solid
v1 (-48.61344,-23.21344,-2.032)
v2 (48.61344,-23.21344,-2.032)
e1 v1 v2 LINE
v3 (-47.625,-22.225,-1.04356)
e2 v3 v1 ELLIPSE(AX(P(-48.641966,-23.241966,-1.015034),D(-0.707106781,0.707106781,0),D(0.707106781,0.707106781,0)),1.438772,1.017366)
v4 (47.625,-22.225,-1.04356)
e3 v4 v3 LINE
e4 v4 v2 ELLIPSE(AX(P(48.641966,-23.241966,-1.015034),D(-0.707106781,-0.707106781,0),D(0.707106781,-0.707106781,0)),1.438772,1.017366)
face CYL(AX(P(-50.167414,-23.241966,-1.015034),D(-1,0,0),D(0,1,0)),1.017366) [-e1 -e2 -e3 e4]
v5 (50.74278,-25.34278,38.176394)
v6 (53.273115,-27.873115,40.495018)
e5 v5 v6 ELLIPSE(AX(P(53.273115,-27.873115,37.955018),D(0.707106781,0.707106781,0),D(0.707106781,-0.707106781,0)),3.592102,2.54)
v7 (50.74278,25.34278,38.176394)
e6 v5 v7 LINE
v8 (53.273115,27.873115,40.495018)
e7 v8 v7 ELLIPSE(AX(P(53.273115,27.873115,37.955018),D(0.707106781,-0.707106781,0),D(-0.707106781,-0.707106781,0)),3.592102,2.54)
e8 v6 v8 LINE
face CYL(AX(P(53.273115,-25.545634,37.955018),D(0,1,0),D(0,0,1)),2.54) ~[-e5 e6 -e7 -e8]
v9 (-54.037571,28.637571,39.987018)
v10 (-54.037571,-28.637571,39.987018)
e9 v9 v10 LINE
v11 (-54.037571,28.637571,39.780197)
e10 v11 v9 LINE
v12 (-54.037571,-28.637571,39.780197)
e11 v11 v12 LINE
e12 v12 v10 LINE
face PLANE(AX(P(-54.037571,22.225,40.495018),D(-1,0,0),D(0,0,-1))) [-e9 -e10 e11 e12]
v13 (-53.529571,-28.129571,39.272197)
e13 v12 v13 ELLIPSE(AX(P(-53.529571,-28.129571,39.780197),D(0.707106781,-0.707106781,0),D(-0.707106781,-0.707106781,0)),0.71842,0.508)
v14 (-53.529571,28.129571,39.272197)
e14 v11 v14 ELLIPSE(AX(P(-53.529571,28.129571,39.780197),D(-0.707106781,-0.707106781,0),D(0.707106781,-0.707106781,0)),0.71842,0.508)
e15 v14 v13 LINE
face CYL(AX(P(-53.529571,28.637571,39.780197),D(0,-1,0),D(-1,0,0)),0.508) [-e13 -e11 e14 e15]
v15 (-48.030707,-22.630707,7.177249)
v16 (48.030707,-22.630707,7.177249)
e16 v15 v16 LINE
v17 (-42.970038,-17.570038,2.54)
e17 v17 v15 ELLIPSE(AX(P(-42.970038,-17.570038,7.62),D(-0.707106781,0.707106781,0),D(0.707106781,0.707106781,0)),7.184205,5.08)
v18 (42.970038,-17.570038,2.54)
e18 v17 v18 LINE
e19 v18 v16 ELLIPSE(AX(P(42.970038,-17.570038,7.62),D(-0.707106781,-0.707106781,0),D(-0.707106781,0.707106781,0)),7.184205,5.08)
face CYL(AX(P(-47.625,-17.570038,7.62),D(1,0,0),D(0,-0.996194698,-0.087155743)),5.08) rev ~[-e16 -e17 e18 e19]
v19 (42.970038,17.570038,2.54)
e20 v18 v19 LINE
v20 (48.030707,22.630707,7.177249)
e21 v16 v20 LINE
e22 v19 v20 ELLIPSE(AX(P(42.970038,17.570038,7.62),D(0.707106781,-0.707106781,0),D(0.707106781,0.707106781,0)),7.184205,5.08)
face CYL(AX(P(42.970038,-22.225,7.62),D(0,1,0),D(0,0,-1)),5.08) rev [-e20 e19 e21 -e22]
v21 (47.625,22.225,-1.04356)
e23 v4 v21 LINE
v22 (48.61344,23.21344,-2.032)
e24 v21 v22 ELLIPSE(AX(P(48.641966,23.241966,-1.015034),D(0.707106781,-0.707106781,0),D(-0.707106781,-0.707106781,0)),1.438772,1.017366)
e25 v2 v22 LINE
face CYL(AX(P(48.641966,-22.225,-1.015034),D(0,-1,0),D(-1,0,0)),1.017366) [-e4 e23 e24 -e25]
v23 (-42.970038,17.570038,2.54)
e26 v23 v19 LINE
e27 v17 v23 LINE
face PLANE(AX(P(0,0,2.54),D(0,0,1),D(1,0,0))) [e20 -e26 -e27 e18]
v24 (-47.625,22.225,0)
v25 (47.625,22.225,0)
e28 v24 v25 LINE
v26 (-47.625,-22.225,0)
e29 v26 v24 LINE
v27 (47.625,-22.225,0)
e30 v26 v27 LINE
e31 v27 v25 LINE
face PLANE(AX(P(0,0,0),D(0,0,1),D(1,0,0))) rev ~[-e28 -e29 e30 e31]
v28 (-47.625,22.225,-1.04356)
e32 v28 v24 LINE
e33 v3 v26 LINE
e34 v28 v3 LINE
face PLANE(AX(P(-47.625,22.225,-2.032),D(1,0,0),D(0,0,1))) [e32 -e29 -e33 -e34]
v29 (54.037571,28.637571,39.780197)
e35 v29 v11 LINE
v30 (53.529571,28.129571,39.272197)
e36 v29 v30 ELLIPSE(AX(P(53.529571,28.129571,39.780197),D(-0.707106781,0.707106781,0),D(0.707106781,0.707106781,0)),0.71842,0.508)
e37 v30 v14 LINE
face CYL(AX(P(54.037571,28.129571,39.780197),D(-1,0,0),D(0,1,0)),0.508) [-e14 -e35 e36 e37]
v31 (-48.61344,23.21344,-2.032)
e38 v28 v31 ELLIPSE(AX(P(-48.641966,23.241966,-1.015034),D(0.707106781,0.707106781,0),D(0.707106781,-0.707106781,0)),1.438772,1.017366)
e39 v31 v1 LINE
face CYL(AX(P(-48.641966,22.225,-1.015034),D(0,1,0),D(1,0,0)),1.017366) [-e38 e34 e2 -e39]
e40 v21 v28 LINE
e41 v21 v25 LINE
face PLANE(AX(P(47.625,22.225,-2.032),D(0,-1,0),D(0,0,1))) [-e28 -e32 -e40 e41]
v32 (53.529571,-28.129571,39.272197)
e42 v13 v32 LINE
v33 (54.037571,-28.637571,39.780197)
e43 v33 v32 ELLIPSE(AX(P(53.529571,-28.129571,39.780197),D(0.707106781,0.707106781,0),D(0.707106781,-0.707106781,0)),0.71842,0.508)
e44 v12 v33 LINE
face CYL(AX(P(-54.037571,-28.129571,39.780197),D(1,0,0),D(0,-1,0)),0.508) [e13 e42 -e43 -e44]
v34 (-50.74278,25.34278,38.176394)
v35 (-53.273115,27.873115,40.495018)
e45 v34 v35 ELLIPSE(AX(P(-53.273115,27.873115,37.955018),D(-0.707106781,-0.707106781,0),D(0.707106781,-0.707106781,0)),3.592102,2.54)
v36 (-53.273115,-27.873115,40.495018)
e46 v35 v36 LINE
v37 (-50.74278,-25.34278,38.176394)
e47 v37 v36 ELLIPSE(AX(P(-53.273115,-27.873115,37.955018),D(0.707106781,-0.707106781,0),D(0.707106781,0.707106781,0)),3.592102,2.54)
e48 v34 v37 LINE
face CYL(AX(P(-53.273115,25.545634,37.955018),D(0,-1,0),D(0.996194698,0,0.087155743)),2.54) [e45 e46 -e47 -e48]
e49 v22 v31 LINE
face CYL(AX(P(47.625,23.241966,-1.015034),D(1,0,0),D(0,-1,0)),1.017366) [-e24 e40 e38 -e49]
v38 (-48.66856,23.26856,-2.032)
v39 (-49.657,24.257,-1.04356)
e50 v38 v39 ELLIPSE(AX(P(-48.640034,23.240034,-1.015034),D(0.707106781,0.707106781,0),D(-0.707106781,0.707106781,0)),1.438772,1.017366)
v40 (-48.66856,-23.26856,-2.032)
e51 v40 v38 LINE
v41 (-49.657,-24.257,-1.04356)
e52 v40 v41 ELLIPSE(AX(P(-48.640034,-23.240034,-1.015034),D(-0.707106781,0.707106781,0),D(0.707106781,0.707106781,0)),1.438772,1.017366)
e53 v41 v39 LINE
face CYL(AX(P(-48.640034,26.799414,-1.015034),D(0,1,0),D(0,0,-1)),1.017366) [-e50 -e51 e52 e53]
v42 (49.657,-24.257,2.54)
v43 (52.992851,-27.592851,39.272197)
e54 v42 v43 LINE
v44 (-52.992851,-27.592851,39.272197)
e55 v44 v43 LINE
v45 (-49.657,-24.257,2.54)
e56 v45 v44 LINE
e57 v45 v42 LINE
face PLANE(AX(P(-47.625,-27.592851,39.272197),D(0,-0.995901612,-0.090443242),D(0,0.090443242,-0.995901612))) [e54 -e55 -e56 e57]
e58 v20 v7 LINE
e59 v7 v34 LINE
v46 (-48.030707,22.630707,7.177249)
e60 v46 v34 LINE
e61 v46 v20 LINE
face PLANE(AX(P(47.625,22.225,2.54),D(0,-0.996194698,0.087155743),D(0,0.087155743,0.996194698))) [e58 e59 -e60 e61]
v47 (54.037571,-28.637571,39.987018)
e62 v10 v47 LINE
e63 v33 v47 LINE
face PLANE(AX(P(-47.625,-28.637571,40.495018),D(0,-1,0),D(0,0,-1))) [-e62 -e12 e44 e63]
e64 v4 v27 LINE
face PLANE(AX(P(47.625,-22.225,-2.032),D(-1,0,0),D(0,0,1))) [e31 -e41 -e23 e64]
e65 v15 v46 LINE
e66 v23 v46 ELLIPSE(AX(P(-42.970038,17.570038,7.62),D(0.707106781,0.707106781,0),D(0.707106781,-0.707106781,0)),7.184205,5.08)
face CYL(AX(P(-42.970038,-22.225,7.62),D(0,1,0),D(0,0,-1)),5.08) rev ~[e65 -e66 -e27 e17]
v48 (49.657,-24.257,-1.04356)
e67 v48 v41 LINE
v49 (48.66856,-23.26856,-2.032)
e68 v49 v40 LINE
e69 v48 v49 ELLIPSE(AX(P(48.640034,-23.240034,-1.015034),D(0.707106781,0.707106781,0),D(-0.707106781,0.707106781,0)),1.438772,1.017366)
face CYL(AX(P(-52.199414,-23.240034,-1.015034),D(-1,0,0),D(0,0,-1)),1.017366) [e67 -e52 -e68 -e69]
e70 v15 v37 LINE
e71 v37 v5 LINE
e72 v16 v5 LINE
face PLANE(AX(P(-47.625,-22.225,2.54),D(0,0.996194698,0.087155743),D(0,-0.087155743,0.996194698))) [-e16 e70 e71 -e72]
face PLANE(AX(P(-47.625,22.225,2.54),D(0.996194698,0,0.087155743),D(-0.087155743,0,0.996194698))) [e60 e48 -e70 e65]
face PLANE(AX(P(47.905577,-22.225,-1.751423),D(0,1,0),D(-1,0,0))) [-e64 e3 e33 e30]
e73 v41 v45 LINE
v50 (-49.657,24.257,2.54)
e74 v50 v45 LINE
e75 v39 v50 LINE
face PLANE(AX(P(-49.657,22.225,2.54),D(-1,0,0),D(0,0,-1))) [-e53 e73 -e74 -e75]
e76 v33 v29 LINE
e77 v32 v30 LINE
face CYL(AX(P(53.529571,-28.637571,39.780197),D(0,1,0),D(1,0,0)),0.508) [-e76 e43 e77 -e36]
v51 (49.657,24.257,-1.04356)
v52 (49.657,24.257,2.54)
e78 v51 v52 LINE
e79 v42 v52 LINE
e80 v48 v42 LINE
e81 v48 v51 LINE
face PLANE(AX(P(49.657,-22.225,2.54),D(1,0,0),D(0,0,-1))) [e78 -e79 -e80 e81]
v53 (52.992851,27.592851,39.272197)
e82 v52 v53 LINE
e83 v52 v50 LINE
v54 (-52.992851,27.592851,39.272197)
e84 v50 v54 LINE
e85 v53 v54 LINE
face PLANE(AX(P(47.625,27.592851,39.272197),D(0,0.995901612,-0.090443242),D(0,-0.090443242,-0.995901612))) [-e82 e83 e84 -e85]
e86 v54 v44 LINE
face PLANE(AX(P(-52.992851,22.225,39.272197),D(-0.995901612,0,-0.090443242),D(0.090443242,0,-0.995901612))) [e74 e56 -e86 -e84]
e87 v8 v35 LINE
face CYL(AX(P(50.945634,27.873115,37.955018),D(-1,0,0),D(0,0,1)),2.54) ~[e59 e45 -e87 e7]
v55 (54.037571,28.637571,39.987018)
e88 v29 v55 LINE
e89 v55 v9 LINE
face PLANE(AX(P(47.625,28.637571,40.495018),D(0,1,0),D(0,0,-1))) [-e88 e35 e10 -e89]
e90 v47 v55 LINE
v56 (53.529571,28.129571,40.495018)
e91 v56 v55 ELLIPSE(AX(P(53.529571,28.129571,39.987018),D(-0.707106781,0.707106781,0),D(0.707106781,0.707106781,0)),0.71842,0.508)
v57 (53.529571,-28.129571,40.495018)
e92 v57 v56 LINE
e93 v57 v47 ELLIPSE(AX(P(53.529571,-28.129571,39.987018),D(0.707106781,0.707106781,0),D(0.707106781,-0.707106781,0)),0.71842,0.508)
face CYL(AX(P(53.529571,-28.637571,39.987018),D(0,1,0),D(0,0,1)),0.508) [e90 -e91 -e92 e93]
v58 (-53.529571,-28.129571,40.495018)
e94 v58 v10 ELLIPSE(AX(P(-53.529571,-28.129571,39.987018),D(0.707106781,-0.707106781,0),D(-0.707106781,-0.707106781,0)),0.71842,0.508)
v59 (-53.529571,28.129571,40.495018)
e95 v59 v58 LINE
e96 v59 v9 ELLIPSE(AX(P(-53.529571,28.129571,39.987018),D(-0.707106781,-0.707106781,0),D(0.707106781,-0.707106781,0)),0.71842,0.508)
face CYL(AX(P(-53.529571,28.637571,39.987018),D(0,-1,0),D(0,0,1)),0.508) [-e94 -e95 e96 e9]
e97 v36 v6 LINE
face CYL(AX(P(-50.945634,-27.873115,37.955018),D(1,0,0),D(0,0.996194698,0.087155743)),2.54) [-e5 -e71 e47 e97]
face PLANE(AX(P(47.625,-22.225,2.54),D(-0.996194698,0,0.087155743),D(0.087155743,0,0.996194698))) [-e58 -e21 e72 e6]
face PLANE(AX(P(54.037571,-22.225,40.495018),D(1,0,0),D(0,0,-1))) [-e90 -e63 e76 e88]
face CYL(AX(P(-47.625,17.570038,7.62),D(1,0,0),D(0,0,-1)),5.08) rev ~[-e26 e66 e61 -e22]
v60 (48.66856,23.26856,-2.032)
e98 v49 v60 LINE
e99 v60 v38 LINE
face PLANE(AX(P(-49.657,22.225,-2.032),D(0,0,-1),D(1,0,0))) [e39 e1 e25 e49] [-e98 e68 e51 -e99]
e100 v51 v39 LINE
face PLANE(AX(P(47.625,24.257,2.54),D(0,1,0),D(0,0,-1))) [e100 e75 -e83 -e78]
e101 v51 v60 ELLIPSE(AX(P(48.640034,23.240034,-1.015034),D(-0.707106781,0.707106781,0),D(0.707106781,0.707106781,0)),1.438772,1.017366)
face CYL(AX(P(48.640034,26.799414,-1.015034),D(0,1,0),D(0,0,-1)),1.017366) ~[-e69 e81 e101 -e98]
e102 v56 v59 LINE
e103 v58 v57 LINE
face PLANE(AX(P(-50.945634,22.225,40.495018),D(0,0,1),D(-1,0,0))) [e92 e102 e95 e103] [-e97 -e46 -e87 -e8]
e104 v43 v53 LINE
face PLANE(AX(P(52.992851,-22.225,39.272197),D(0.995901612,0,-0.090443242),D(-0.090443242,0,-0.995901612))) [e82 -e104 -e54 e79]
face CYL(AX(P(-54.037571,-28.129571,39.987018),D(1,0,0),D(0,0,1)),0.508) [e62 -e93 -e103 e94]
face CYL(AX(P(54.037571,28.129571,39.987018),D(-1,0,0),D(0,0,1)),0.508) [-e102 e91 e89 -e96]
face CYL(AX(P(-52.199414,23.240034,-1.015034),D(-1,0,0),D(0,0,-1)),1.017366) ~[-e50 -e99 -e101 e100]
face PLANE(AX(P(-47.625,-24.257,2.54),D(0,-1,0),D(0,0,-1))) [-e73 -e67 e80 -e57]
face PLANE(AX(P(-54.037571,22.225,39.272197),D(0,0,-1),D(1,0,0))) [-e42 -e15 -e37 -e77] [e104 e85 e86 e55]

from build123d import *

# Parameters (mm, degrees)
F0_W         = 95.25
F0_H         = 44.45
F1_DEPTH     = 2.54
F4_T1_DEPTH  = 44.45
F4_T3_DEPTH  = 95.25
F4_T5_DEPTH  = 53.5988288205
F4_T7_DEPTH  = 104.3988288205
F4_T13_DEPTH = 46.9924144102
F4_T18_DEPTH = 97.7924144102
F4_T26_DEPTH = 46.9924144102
F4_T31_DEPTH = 97.7924144102
F4_T39_DEPTH = 97.7924144102
F4_T44_DEPTH = 46.9924144102
F4_T52_DEPTH = 46.9924144102
F4_T57_DEPTH = 97.7924144102
F5_R         = 5.08
F6_R         = 2.54
F7_R         = 0.508


# Not quite as in the source:
# - a fillet or chamfer that OpenCascade refuses, or shapes differently, is made with other operations: its cross-section is extruded or revolved along the edge and cut away or added


with BuildPart() as f1:
    # F0 (on Top) → F1 (new body)
    with BuildSketch(Plane.XY):
        Rectangle(F0_W, F0_H)
    extrude(amount=F1_DEPTH)

    # F3: sweep along a path in F3_path
    with BuildLine(Plane(origin=(-47.625, 22.225, 2.54), x_dir=(0, -1, 0), z_dir=(0, 0, -1))) as f3_path:
        Line((0, 0), (44.45, 0))
        Line((44.45, 0), (44.45, -95.25))
        Line((44.45, -95.25), (0, -95.25))
        Line((0, -95.25), (0, 0))
    # F2 (on face) → F3 (sweep)
    with BuildSketch(Plane.XZ.offset(22.225)):
        Polygon((-52.9928505421, 39.2721965909), (-49.657, 2.54), (-49.657, -2.032), (-47.625, -2.032), (-47.625, 0), (-47.625, 2.54), (-50.9456337987, 40.4950179973), (-54.0375709534, 40.4950179973), (-54.0375709534, 39.2721965909), align=None)
    sweep(path=f3_path.line, transition=Transition.RIGHT)

    # F4: fillet of radius 1.016 on 16 edges, made by hand

    # F4_s2 → F4_t1 (cut)
    with BuildSketch(Plane.XZ.offset(-22.225)):
        with BuildLine():
            ThreePointArc((47.6246, -1.0150343146), (47.9225795103, -1.7344204897), (48.6419656854, -2.0324))
            Line((48.6419656854, -2.0324), (48.6419656854, -2.1341365685))
            ThreePointArc((48.6419656854, -2.1341365685), (48.1334828427, -2.1337365685), (47.625, -2.1337365685))
            Line((47.625, -2.1337365685), (47.5232634315, -2.032))
            ThreePointArc((47.5232634315, -2.032), (47.5232634315, -1.5235171573), (47.5228634315, -1.0150343146))
            Line((47.5228634315, -1.0150343146), (47.6246, -1.0150343146))
        make_face()
        with BuildLine():
            ThreePointArc((-47.6246, -1.0150343146), (-47.9225795103, -1.7344204897), (-48.6419656854, -2.0324))
            Line((-48.6419656854, -2.0324), (-48.6419656854, -2.1341365685))
            ThreePointArc((-48.6419656854, -2.1341365685), (-48.1334828427, -2.1337365685), (-47.625, -2.1337365685))
            Line((-47.625, -2.1337365685), (-47.5232634315, -2.032))
            ThreePointArc((-47.5232634315, -2.032), (-47.5232634315, -1.5235171573), (-47.5228634315, -1.0150343146))
            Line((-47.5228634315, -1.0150343146), (-47.6246, -1.0150343146))
        make_face()
    extrude(amount=F4_T1_DEPTH, mode=Mode.SUBTRACT)

    # F4_s4 → F4_t3 (cut)
    with BuildSketch(Plane.YZ.offset(-47.625)):
        with BuildLine():
            ThreePointArc((22.2246, -1.0150343146), (22.5225795103, -1.7344204897), (23.2419656854, -2.0324))
            Line((23.2419656854, -2.0324), (23.2419656854, -2.1341365685))
            ThreePointArc((23.2419656854, -2.1341365685), (22.7334828427, -2.1337365685), (22.225, -2.1337365685))
            Line((22.225, -2.1337365685), (22.1232634315, -2.032))
            ThreePointArc((22.1232634315, -2.032), (22.1232634315, -1.5235171573), (22.1228634315, -1.0150343146))
            Line((22.1228634315, -1.0150343146), (22.2246, -1.0150343146))
        make_face()
        with BuildLine():
            ThreePointArc((-22.2246, -1.0150343146), (-22.5225795103, -1.7344204897), (-23.2419656854, -2.0324))
            Line((-23.2419656854, -2.0324), (-23.2419656854, -2.1341365685))
            ThreePointArc((-23.2419656854, -2.1341365685), (-22.7334828427, -2.1337365685), (-22.225, -2.1337365685))
            Line((-22.225, -2.1337365685), (-22.1232634315, -2.032))
            ThreePointArc((-22.1232634315, -2.032), (-22.1232634315, -1.5235171573), (-22.1228634315, -1.0150343146))
            Line((-22.1228634315, -1.0150343146), (-22.2246, -1.0150343146))
        make_face()
    extrude(amount=F4_T3_DEPTH, mode=Mode.SUBTRACT)

    # F4_s6 → F4_t5 (cut)
    with BuildSketch(Plane.XZ.offset(-26.7994144102)):
        with BuildLine():
            ThreePointArc((-48.6400343146, -2.0324), (-49.3594204897, -1.7344204897), (-49.6574, -1.0150343146))
            Line((-49.6574, -1.0150343146), (-49.7591365685, -1.0150343146))
            ThreePointArc((-49.7591365685, -1.0150343146), (-49.7587365685, -1.5235171573), (-49.7587365685, -2.032))
            Line((-49.7587365685, -2.032), (-49.657, -2.1337365685))
            ThreePointArc((-49.657, -2.1337365685), (-49.1485171573, -2.1337365685), (-48.6400343146, -2.1341365685))
            Line((-48.6400343146, -2.1341365685), (-48.6400343146, -2.0324))
        make_face()
        with BuildLine():
            ThreePointArc((48.6400343146, -2.0324), (49.3594204897, -1.7344204897), (49.6574, -1.0150343146))
            Line((49.6574, -1.0150343146), (49.7591365685, -1.0150343146))
            ThreePointArc((49.7591365685, -1.0150343146), (49.7587365685, -1.5235171573), (49.7587365685, -2.032))
            Line((49.7587365685, -2.032), (49.657, -2.1337365685))
            ThreePointArc((49.657, -2.1337365685), (49.1485171573, -2.1337365685), (48.6400343146, -2.1341365685))
            Line((48.6400343146, -2.1341365685), (48.6400343146, -2.0324))
        make_face()
    extrude(amount=F4_T5_DEPTH, mode=Mode.SUBTRACT)

    # F4_s8 → F4_t7 (cut)
    with BuildSketch(Plane.YZ.offset(-52.1994144102)):
        with BuildLine():
            ThreePointArc((23.2400343146, -2.0324), (23.9594204897, -1.7344204897), (24.2574, -1.0150343146))
            Line((24.2574, -1.0150343146), (24.3591365685, -1.0150343146))
            ThreePointArc((24.3591365685, -1.0150343146), (24.3587365685, -1.5235171573), (24.3587365685, -2.032))
            Line((24.3587365685, -2.032), (24.257, -2.1337365685))
            ThreePointArc((24.257, -2.1337365685), (23.7485171573, -2.1337365685), (23.2400343146, -2.1341365685))
            Line((23.2400343146, -2.1341365685), (23.2400343146, -2.0324))
        make_face()
        with BuildLine():
            ThreePointArc((-23.2400343146, -2.0324), (-23.9594204897, -1.7344204897), (-24.2574, -1.0150343146))
            Line((-24.2574, -1.0150343146), (-24.3591365685, -1.0150343146))
            ThreePointArc((-24.3591365685, -1.0150343146), (-24.3587365685, -1.5235171573), (-24.3587365685, -2.032))
            Line((-24.3587365685, -2.032), (-24.257, -2.1337365685))
            ThreePointArc((-24.257, -2.1337365685), (-23.7485171573, -2.1337365685), (-23.2400343146, -2.1341365685))
            Line((-23.2400343146, -2.1341365685), (-23.2400343146, -2.0324))
        make_face()
    extrude(amount=F4_T7_DEPTH, mode=Mode.SUBTRACT)


with BuildPart() as f4_tool11:
    # F4_s12 → F4_t13 (new body)
    with BuildSketch(Plane.XZ.offset(24.7674144102)):
        with BuildLine():
            ThreePointArc((47.6246, -1.0150343146), (47.9225795103, -1.7344204897), (48.6419656854, -2.0324))
            Line((48.6419656854, -2.0324), (48.6419656854, -2.1341365685))
            ThreePointArc((48.6419656854, -2.1341365685), (48.1334828427, -2.1337365685), (47.625, -2.1337365685))
            Line((47.625, -2.1337365685), (47.5232634315, -2.032))
            ThreePointArc((47.5232634315, -2.032), (47.5232634315, -1.5235171573), (47.5228634315, -1.0150343146))
            Line((47.5228634315, -1.0150343146), (47.6246, -1.0150343146))
        make_face()
    extrude(amount=-F4_T13_DEPTH)

    split(bisect_by=Plane.XZ.offset(22.225), keep=Keep.TOP)

    split(bisect_by=Plane.XZ.offset(24.257), keep=Keep.BOTTOM)


with BuildPart() as f4_tool16:
    # F4_s17 → F4_t18 (new body)
    with BuildSketch(Plane.YZ.offset(-47.625)):
        with BuildLine():
            ThreePointArc((-22.2246, -1.0150343146), (-22.5225795103, -1.7344204897), (-23.2419656854, -2.0324))
            Line((-23.2419656854, -2.0324), (-23.2419656854, -2.1341365685))
            ThreePointArc((-23.2419656854, -2.1341365685), (-22.7334828427, -2.1337365685), (-22.225, -2.1337365685))
            Line((-22.225, -2.1337365685), (-22.1232634315, -2.032))
            ThreePointArc((-22.1232634315, -2.032), (-22.1232634315, -1.5235171573), (-22.1228634315, -1.0150343146))
            Line((-22.1228634315, -1.0150343146), (-22.2246, -1.0150343146))
        make_face()
    extrude(amount=F4_T18_DEPTH)

    split(bisect_by=Plane.YZ.offset(47.625), keep=Keep.TOP)

    split(bisect_by=Plane.YZ.offset(49.657), keep=Keep.BOTTOM)


with BuildPart() as f4_tool11_1:
    add(f4_tool11.part)

    # F4_t21: intersect F4_tool16
    add(f4_tool16.part, mode=Mode.INTERSECT)


with BuildPart() as f1_1:
    add(f1.part)

    # F4_t9: cut F4_tool11
    add(f4_tool11_1.part, mode=Mode.SUBTRACT)


with BuildPart() as f4_tool24:
    # F4_s25 → F4_t26 (new body)
    with BuildSketch(Plane.XZ.offset(22.225)):
        with BuildLine():
            ThreePointArc((47.6246, -1.0150343146), (47.9225795103, -1.7344204897), (48.6419656854, -2.0324))
            Line((48.6419656854, -2.0324), (48.6419656854, -2.1341365685))
            ThreePointArc((48.6419656854, -2.1341365685), (48.1334828427, -2.1337365685), (47.625, -2.1337365685))
            Line((47.625, -2.1337365685), (47.5232634315, -2.032))
            ThreePointArc((47.5232634315, -2.032), (47.5232634315, -1.5235171573), (47.5228634315, -1.0150343146))
            Line((47.5228634315, -1.0150343146), (47.6246, -1.0150343146))
        make_face()
    extrude(amount=-F4_T26_DEPTH)

    split(bisect_by=Plane.XZ.offset(-22.225), keep=Keep.BOTTOM)

    split(bisect_by=Plane.XZ.offset(-24.257), keep=Keep.TOP)


with BuildPart() as f4_tool29:
    # F4_s30 → F4_t31 (new body)
    with BuildSketch(Plane.YZ.offset(50.1674144102)):
        with BuildLine():
            ThreePointArc((22.2246, -1.0150343146), (22.5225795103, -1.7344204897), (23.2419656854, -2.0324))
            Line((23.2419656854, -2.0324), (23.2419656854, -2.1341365685))
            ThreePointArc((23.2419656854, -2.1341365685), (22.7334828427, -2.1337365685), (22.225, -2.1337365685))
            Line((22.225, -2.1337365685), (22.1232634315, -2.032))
            ThreePointArc((22.1232634315, -2.032), (22.1232634315, -1.5235171573), (22.1228634315, -1.0150343146))
            Line((22.1228634315, -1.0150343146), (22.2246, -1.0150343146))
        make_face()
    extrude(amount=-F4_T31_DEPTH)

    split(bisect_by=Plane.YZ.offset(47.625), keep=Keep.TOP)

    split(bisect_by=Plane.YZ.offset(49.657), keep=Keep.BOTTOM)


with BuildPart() as f4_tool24_1:
    add(f4_tool24.part)

    # F4_t34: intersect F4_tool29
    add(f4_tool29.part, mode=Mode.INTERSECT)


with BuildPart() as f1_2:
    add(f1_1.part)

    # F4_t22: cut F4_tool24
    add(f4_tool24_1.part, mode=Mode.SUBTRACT)


with BuildPart() as f4_tool37:
    # F4_s38 → F4_t39 (new body)
    with BuildSketch(Plane.YZ.offset(47.625)):
        with BuildLine():
            ThreePointArc((22.2246, -1.0150343146), (22.5225795103, -1.7344204897), (23.2419656854, -2.0324))
            Line((23.2419656854, -2.0324), (23.2419656854, -2.1341365685))
            ThreePointArc((23.2419656854, -2.1341365685), (22.7334828427, -2.1337365685), (22.225, -2.1337365685))
            Line((22.225, -2.1337365685), (22.1232634315, -2.032))
            ThreePointArc((22.1232634315, -2.032), (22.1232634315, -1.5235171573), (22.1228634315, -1.0150343146))
            Line((22.1228634315, -1.0150343146), (22.2246, -1.0150343146))
        make_face()
    extrude(amount=-F4_T39_DEPTH)

    split(bisect_by=Plane.YZ.offset(-47.625), keep=Keep.BOTTOM)

    split(bisect_by=Plane.YZ.offset(-49.657), keep=Keep.TOP)


with BuildPart() as f4_tool42:
    # F4_s43 → F4_t44 (new body)
    with BuildSketch(Plane.XZ.offset(-24.7674144102)):
        with BuildLine():
            ThreePointArc((-47.6246, -1.0150343146), (-47.9225795103, -1.7344204897), (-48.6419656854, -2.0324))
            Line((-48.6419656854, -2.0324), (-48.6419656854, -2.1341365685))
            ThreePointArc((-48.6419656854, -2.1341365685), (-48.1334828427, -2.1337365685), (-47.625, -2.1337365685))
            Line((-47.625, -2.1337365685), (-47.5232634315, -2.032))
            ThreePointArc((-47.5232634315, -2.032), (-47.5232634315, -1.5235171573), (-47.5228634315, -1.0150343146))
            Line((-47.5228634315, -1.0150343146), (-47.6246, -1.0150343146))
        make_face()
    extrude(amount=F4_T44_DEPTH)

    split(bisect_by=Plane.XZ.offset(-22.225), keep=Keep.BOTTOM)

    split(bisect_by=Plane.XZ.offset(-24.257), keep=Keep.TOP)


with BuildPart() as f4_tool37_1:
    add(f4_tool37.part)

    # F4_t47: intersect F4_tool42
    add(f4_tool42.part, mode=Mode.INTERSECT)


with BuildPart() as f1_3:
    add(f1_2.part)

    # F4_t35: cut F4_tool37
    add(f4_tool37_1.part, mode=Mode.SUBTRACT)


with BuildPart() as f4_tool50:
    # F4_s51 → F4_t52 (new body)
    with BuildSketch(Plane.XZ.offset(-22.225)):
        with BuildLine():
            ThreePointArc((-47.6246, -1.0150343146), (-47.9225795103, -1.7344204897), (-48.6419656854, -2.0324))
            Line((-48.6419656854, -2.0324), (-48.6419656854, -2.1341365685))
            ThreePointArc((-48.6419656854, -2.1341365685), (-48.1334828427, -2.1337365685), (-47.625, -2.1337365685))
            Line((-47.625, -2.1337365685), (-47.5232634315, -2.032))
            ThreePointArc((-47.5232634315, -2.032), (-47.5232634315, -1.5235171573), (-47.5228634315, -1.0150343146))
            Line((-47.5228634315, -1.0150343146), (-47.6246, -1.0150343146))
        make_face()
    extrude(amount=F4_T52_DEPTH)

    split(bisect_by=Plane.XZ.offset(22.225), keep=Keep.TOP)

    split(bisect_by=Plane.XZ.offset(24.257), keep=Keep.BOTTOM)


with BuildPart() as f4_tool55:
    # F4_s56 → F4_t57 (new body)
    with BuildSketch(Plane.YZ.offset(-50.1674144102)):
        with BuildLine():
            ThreePointArc((-22.2246, -1.0150343146), (-22.5225795103, -1.7344204897), (-23.2419656854, -2.0324))
            Line((-23.2419656854, -2.0324), (-23.2419656854, -2.1341365685))
            ThreePointArc((-23.2419656854, -2.1341365685), (-22.7334828427, -2.1337365685), (-22.225, -2.1337365685))
            Line((-22.225, -2.1337365685), (-22.1232634315, -2.032))
            ThreePointArc((-22.1232634315, -2.032), (-22.1232634315, -1.5235171573), (-22.1228634315, -1.0150343146))
            Line((-22.1228634315, -1.0150343146), (-22.2246, -1.0150343146))
        make_face()
    extrude(amount=F4_T57_DEPTH)

    split(bisect_by=Plane.YZ.offset(-47.625), keep=Keep.BOTTOM)

    split(bisect_by=Plane.YZ.offset(-49.657), keep=Keep.TOP)


with BuildPart() as f4_tool50_1:
    add(f4_tool50.part)

    # F4_t60: intersect F4_tool55
    add(f4_tool55.part, mode=Mode.INTERSECT)


with BuildPart() as f1_4:
    add(f1_3.part)

    # F4_t48: cut F4_tool50
    add(f4_tool50_1.part, mode=Mode.SUBTRACT)

    # F5
    f5_edges = [f1_4.edges().sort_by_distance(p)[0] for p in [
        (0, 22.225, 2.54),
        (-47.625, 0, 2.54),
        (47.625, 0, 2.54),
        (0, -22.225, 2.54),
    ]]
    fillet(f5_edges, radius=F5_R)

    # F6
    f6_edges = [f1_4.edges().sort_by_distance(p)[0] for p in [
        (0, -25.545634, 40.495018),
        (-50.945634, 0, 40.495018),
        (0, 25.545634, 40.495018),
        (50.945634, 0, 40.495018),
    ]]
    fillet(f6_edges, radius=F6_R)

    # F7
    f7_edges = [f1_4.edges().sort_by_distance(p)[0] for p in [
        (-54.037571, 0, 40.495018),
        (0, -28.637571, 40.495018),
        (54.037571, 0, 40.495018),
        (0, 28.637571, 40.495018),
        (-54.037571, 0, 39.272197),
        (0, -28.637571, 39.272197),
        (54.037571, 0, 39.272197),
        (0, 28.637571, 39.272197),
    ]]
    fillet(f7_edges, radius=F7_R)


solid = f1_4.part
